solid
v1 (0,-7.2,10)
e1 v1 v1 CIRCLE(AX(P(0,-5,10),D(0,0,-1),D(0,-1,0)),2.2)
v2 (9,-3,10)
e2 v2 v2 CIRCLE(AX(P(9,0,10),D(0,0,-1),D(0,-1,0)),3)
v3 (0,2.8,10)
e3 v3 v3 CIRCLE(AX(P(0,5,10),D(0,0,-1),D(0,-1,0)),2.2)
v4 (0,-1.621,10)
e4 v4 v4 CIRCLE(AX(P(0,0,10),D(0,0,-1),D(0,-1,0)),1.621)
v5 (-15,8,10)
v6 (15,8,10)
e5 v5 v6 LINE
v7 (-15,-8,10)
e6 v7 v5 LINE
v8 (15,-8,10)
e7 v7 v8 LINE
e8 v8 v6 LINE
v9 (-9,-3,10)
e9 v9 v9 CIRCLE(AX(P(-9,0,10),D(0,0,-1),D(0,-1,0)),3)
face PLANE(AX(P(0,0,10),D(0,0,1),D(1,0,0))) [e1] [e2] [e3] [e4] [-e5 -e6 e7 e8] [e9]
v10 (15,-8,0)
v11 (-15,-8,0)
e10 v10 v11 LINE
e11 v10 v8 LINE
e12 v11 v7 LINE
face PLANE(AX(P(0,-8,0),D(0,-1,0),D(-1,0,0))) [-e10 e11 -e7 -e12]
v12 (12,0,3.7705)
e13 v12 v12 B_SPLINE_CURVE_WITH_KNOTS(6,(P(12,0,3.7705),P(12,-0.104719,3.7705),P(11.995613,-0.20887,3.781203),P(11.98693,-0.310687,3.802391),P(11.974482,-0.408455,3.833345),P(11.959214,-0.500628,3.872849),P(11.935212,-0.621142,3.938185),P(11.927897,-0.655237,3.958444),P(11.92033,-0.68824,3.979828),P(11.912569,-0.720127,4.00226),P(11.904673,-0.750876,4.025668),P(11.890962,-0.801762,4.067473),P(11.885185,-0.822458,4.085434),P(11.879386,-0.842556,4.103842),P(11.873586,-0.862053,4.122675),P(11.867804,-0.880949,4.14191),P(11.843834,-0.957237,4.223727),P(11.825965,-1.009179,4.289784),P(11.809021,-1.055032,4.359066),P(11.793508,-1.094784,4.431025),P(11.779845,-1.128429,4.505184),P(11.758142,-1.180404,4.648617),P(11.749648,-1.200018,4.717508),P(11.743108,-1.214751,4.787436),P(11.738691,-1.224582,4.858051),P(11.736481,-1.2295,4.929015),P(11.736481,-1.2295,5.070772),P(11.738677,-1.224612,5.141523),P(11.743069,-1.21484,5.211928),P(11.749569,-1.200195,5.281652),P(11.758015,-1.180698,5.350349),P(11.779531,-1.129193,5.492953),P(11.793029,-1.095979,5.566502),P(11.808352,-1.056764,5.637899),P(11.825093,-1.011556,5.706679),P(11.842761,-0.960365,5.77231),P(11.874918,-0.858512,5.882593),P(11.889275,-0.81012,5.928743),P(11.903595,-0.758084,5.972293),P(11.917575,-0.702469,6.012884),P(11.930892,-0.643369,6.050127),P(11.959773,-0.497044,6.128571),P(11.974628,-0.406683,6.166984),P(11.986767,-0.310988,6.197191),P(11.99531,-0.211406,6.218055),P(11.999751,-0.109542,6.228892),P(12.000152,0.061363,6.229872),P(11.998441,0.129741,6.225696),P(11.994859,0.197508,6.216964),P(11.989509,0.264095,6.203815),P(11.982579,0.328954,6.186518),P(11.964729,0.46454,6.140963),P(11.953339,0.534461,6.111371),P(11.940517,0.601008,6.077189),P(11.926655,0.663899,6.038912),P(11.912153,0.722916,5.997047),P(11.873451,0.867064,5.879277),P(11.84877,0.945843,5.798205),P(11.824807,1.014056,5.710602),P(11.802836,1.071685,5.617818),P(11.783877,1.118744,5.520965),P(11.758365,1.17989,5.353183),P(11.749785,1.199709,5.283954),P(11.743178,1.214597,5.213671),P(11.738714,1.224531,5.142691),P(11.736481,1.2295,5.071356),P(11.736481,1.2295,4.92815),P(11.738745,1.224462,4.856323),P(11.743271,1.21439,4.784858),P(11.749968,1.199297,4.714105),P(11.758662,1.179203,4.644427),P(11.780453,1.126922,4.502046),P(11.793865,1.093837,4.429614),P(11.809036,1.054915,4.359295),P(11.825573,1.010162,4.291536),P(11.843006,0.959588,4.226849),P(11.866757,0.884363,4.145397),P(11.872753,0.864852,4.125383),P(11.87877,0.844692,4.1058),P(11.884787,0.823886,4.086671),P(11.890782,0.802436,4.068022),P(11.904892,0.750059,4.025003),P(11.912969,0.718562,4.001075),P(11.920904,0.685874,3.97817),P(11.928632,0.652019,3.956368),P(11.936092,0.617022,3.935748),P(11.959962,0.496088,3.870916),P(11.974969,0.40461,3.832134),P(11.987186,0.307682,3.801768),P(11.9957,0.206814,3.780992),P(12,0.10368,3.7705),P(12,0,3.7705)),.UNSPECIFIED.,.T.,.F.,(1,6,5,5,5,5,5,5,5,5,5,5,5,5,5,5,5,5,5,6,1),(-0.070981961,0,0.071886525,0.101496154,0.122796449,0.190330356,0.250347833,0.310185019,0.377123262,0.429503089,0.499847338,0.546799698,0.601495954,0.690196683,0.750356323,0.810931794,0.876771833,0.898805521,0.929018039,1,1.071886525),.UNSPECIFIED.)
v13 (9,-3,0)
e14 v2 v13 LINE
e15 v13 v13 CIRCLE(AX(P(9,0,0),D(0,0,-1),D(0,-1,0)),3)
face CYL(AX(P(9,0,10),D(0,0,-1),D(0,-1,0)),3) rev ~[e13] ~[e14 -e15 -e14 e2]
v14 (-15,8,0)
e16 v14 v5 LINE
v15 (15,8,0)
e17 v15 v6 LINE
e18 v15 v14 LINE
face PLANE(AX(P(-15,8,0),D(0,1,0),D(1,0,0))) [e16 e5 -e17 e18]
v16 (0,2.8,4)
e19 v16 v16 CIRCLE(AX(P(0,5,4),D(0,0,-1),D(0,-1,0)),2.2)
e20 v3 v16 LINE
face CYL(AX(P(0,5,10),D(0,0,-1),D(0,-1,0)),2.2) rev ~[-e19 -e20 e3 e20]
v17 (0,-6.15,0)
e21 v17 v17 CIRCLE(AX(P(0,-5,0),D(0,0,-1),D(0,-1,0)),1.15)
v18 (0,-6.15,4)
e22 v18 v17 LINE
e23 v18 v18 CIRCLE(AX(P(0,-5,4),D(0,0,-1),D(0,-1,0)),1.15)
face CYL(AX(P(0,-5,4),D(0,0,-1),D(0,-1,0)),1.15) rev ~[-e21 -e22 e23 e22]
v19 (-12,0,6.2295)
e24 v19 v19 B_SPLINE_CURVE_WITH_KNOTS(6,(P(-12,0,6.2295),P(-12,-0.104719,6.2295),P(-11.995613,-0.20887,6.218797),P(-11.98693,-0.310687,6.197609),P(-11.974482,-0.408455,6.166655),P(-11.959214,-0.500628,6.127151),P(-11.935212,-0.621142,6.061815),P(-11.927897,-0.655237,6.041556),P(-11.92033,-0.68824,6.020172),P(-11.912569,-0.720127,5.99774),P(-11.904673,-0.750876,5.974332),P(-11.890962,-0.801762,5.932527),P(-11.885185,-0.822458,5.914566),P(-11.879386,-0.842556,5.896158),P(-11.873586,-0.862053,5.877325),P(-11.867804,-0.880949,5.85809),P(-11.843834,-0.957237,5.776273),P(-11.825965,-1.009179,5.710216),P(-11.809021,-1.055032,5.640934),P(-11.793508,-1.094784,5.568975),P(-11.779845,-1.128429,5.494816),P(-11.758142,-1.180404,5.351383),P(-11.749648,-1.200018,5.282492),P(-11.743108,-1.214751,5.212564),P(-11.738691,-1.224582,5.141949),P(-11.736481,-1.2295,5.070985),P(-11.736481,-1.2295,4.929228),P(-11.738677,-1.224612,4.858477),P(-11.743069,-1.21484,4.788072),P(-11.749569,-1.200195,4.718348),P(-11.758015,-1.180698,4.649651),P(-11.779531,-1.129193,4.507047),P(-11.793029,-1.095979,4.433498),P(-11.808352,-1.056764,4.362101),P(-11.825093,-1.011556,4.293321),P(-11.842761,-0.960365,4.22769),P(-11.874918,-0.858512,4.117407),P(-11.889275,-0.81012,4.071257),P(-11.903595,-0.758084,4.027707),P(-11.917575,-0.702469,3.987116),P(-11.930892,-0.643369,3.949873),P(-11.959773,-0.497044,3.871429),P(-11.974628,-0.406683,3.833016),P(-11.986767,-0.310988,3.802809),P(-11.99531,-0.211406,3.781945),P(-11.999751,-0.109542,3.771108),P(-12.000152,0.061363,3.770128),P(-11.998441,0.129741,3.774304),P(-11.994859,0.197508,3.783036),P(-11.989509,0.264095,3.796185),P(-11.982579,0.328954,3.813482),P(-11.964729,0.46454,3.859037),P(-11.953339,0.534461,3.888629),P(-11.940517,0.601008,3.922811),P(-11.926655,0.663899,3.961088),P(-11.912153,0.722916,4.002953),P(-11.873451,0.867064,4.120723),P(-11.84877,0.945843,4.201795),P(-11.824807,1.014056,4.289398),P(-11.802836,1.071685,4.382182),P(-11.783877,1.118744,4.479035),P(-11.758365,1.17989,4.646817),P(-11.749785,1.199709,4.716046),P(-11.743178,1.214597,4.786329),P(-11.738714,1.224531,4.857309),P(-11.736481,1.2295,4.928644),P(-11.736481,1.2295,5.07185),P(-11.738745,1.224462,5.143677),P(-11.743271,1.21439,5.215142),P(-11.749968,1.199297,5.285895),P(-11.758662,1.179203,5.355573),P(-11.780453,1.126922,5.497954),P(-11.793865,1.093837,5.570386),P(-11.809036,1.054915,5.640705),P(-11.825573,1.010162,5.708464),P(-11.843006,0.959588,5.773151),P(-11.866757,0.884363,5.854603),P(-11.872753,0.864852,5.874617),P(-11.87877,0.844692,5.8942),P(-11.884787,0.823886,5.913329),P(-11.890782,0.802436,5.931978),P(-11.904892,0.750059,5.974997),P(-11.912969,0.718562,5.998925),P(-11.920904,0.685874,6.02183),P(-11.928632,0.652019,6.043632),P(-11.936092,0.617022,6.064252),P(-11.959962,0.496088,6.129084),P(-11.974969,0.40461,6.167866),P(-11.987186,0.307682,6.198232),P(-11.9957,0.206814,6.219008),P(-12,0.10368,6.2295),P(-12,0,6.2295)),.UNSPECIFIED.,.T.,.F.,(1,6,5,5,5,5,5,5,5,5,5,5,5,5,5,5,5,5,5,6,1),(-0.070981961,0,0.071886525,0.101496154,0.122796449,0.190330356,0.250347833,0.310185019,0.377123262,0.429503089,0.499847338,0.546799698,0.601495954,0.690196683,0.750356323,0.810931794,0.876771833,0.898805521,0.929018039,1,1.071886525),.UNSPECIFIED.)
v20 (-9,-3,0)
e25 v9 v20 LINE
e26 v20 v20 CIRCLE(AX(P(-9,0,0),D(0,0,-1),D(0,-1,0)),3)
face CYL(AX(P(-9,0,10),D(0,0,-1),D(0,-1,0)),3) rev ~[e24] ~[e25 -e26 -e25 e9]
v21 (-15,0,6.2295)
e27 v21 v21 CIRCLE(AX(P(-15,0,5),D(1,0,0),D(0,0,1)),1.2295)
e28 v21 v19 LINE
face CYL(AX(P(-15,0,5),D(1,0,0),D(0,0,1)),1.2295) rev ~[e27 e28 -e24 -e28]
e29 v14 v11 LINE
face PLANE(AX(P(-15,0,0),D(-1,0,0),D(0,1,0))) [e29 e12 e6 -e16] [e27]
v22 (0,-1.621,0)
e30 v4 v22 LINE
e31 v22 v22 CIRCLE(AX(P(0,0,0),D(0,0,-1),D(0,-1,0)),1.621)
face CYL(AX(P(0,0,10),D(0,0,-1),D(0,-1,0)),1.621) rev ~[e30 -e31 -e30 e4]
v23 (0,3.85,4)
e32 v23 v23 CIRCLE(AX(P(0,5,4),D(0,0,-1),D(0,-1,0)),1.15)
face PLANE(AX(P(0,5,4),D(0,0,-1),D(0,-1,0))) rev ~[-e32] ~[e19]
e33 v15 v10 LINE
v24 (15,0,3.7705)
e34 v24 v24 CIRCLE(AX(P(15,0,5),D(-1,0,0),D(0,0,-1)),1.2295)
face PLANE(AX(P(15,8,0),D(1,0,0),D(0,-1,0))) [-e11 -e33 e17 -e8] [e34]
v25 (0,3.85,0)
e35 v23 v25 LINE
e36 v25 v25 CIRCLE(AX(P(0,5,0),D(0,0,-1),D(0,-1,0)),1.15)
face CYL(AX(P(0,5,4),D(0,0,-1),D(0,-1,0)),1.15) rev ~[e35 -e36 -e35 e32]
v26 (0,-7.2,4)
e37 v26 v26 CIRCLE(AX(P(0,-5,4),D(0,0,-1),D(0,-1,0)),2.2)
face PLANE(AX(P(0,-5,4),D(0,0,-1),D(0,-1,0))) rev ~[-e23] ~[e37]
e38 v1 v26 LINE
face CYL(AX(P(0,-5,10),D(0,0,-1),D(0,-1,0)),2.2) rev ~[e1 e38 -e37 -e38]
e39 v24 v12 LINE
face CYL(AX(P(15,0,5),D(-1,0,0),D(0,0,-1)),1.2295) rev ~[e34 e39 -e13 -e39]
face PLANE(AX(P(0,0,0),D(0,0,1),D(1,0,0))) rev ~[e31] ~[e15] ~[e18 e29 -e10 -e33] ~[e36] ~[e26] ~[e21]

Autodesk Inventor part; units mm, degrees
ref_plane "YZ Plane" through (0, 0, 0) normal (1, 0, 0) x (0, 1, 0)
ref_plane "XZ Plane" through (0, 0, 0) normal (0, 1, 0) x (-1, 0, 0)
ref_plane "XY Plane" through (0, 0, 0) normal (0, 0, 1) x (1, 0, 0)
sketch "Skizze1" plane through (0, 0, 0) normal (0, 0, 1) x (1, 0, 0)
  line L0 (-15, 8) -> (15, 8)
  line L1 (15, 8) -> (15, -8)
  line L2 (15, -8) -> (-15, -8)
  line L3 (-15, -8) -> (-15, 8)
  line L4 (-21, 0) -> (21, 0) projected
  line L5 (0, -11.2) -> (0, 11.2) projected
  point P0 (0, 0)
  dimension "d0" = 16
  dimension "d1" = 30
extrude "Extrusion1" add sketch "Skizze1" along normal blind 10
sketch "Skizze2" plane through (0, 0, 10) normal (0, 0, 1) x (1, 0, 0)
  line L0 (-21, 0) -> (21, 0) projected
  line L1 (0, -11.2) -> (0, 11.2) projected
  point P0 (0, 0)
  point P1 (-9, 0)
  point P2 (9, 0)
  dimension "d4" = 18
hole "Bohrung1" at (-9, 0, 10) at (9, 0, 10) direction (0, 0, -1) diameter 6 end through all
sketch "Skizze3" plane through (0, 0, 10) normal (0, 0, 1) x (1, 0, 0)
  line L0 (0, -11.2) -> (0, 11.2) projected
  line L1 (-21, 0) -> (21, 0) projected
  point P0 (0, 0)
  point P1 (0, 5)
  point P2 (0, -5)
  dimension "d12" = 10
hole "Bohrung2" at (0, 5, 10) at (0, -5, 10) direction (0, 0, -1) diameter 2.3 end through all counterbore diameter 4.4 counterbore depth 6
sketch "Skizze4" plane through (0, 0, 10) normal (0, 0, 1) x (1, 0, 0)
  point P0 (0, 0)
  point P1 (0, 0)
hole "Bohrung3" at (0, 0, 10) direction (0, 0, -1) diameter 3.242 end through all thread size "M4x0.7" class "6H" standard "ISO Metric profile"
sketch "Skizze5" plane through (-15, -8, 0) normal (-1, 0, 0) x (0, 0, 1)
  line L0 (10, 0) -> (10, 16) projected
  line L1 (0, 16) -> (10, 16) projected
  line L2 (0, 0) -> (10, 0) projected
  line L3 (0, 8) -> (10, 8)
  line L4 (5, 16) -> (5, 0)
  point P0 (5, 8)
hole "Bohrung4" at (-15, 0, 5) direction (1, 0, 0) diameter 2.459 end up to surface thread size "M3x0.5" class "6H" standard "ISO Metric profile"
mirror "Spiegeln1" about plane through (0, 0, 0) normal (1, 0, 0) of "Bohrung4"
properties part number "13_0204_020"
